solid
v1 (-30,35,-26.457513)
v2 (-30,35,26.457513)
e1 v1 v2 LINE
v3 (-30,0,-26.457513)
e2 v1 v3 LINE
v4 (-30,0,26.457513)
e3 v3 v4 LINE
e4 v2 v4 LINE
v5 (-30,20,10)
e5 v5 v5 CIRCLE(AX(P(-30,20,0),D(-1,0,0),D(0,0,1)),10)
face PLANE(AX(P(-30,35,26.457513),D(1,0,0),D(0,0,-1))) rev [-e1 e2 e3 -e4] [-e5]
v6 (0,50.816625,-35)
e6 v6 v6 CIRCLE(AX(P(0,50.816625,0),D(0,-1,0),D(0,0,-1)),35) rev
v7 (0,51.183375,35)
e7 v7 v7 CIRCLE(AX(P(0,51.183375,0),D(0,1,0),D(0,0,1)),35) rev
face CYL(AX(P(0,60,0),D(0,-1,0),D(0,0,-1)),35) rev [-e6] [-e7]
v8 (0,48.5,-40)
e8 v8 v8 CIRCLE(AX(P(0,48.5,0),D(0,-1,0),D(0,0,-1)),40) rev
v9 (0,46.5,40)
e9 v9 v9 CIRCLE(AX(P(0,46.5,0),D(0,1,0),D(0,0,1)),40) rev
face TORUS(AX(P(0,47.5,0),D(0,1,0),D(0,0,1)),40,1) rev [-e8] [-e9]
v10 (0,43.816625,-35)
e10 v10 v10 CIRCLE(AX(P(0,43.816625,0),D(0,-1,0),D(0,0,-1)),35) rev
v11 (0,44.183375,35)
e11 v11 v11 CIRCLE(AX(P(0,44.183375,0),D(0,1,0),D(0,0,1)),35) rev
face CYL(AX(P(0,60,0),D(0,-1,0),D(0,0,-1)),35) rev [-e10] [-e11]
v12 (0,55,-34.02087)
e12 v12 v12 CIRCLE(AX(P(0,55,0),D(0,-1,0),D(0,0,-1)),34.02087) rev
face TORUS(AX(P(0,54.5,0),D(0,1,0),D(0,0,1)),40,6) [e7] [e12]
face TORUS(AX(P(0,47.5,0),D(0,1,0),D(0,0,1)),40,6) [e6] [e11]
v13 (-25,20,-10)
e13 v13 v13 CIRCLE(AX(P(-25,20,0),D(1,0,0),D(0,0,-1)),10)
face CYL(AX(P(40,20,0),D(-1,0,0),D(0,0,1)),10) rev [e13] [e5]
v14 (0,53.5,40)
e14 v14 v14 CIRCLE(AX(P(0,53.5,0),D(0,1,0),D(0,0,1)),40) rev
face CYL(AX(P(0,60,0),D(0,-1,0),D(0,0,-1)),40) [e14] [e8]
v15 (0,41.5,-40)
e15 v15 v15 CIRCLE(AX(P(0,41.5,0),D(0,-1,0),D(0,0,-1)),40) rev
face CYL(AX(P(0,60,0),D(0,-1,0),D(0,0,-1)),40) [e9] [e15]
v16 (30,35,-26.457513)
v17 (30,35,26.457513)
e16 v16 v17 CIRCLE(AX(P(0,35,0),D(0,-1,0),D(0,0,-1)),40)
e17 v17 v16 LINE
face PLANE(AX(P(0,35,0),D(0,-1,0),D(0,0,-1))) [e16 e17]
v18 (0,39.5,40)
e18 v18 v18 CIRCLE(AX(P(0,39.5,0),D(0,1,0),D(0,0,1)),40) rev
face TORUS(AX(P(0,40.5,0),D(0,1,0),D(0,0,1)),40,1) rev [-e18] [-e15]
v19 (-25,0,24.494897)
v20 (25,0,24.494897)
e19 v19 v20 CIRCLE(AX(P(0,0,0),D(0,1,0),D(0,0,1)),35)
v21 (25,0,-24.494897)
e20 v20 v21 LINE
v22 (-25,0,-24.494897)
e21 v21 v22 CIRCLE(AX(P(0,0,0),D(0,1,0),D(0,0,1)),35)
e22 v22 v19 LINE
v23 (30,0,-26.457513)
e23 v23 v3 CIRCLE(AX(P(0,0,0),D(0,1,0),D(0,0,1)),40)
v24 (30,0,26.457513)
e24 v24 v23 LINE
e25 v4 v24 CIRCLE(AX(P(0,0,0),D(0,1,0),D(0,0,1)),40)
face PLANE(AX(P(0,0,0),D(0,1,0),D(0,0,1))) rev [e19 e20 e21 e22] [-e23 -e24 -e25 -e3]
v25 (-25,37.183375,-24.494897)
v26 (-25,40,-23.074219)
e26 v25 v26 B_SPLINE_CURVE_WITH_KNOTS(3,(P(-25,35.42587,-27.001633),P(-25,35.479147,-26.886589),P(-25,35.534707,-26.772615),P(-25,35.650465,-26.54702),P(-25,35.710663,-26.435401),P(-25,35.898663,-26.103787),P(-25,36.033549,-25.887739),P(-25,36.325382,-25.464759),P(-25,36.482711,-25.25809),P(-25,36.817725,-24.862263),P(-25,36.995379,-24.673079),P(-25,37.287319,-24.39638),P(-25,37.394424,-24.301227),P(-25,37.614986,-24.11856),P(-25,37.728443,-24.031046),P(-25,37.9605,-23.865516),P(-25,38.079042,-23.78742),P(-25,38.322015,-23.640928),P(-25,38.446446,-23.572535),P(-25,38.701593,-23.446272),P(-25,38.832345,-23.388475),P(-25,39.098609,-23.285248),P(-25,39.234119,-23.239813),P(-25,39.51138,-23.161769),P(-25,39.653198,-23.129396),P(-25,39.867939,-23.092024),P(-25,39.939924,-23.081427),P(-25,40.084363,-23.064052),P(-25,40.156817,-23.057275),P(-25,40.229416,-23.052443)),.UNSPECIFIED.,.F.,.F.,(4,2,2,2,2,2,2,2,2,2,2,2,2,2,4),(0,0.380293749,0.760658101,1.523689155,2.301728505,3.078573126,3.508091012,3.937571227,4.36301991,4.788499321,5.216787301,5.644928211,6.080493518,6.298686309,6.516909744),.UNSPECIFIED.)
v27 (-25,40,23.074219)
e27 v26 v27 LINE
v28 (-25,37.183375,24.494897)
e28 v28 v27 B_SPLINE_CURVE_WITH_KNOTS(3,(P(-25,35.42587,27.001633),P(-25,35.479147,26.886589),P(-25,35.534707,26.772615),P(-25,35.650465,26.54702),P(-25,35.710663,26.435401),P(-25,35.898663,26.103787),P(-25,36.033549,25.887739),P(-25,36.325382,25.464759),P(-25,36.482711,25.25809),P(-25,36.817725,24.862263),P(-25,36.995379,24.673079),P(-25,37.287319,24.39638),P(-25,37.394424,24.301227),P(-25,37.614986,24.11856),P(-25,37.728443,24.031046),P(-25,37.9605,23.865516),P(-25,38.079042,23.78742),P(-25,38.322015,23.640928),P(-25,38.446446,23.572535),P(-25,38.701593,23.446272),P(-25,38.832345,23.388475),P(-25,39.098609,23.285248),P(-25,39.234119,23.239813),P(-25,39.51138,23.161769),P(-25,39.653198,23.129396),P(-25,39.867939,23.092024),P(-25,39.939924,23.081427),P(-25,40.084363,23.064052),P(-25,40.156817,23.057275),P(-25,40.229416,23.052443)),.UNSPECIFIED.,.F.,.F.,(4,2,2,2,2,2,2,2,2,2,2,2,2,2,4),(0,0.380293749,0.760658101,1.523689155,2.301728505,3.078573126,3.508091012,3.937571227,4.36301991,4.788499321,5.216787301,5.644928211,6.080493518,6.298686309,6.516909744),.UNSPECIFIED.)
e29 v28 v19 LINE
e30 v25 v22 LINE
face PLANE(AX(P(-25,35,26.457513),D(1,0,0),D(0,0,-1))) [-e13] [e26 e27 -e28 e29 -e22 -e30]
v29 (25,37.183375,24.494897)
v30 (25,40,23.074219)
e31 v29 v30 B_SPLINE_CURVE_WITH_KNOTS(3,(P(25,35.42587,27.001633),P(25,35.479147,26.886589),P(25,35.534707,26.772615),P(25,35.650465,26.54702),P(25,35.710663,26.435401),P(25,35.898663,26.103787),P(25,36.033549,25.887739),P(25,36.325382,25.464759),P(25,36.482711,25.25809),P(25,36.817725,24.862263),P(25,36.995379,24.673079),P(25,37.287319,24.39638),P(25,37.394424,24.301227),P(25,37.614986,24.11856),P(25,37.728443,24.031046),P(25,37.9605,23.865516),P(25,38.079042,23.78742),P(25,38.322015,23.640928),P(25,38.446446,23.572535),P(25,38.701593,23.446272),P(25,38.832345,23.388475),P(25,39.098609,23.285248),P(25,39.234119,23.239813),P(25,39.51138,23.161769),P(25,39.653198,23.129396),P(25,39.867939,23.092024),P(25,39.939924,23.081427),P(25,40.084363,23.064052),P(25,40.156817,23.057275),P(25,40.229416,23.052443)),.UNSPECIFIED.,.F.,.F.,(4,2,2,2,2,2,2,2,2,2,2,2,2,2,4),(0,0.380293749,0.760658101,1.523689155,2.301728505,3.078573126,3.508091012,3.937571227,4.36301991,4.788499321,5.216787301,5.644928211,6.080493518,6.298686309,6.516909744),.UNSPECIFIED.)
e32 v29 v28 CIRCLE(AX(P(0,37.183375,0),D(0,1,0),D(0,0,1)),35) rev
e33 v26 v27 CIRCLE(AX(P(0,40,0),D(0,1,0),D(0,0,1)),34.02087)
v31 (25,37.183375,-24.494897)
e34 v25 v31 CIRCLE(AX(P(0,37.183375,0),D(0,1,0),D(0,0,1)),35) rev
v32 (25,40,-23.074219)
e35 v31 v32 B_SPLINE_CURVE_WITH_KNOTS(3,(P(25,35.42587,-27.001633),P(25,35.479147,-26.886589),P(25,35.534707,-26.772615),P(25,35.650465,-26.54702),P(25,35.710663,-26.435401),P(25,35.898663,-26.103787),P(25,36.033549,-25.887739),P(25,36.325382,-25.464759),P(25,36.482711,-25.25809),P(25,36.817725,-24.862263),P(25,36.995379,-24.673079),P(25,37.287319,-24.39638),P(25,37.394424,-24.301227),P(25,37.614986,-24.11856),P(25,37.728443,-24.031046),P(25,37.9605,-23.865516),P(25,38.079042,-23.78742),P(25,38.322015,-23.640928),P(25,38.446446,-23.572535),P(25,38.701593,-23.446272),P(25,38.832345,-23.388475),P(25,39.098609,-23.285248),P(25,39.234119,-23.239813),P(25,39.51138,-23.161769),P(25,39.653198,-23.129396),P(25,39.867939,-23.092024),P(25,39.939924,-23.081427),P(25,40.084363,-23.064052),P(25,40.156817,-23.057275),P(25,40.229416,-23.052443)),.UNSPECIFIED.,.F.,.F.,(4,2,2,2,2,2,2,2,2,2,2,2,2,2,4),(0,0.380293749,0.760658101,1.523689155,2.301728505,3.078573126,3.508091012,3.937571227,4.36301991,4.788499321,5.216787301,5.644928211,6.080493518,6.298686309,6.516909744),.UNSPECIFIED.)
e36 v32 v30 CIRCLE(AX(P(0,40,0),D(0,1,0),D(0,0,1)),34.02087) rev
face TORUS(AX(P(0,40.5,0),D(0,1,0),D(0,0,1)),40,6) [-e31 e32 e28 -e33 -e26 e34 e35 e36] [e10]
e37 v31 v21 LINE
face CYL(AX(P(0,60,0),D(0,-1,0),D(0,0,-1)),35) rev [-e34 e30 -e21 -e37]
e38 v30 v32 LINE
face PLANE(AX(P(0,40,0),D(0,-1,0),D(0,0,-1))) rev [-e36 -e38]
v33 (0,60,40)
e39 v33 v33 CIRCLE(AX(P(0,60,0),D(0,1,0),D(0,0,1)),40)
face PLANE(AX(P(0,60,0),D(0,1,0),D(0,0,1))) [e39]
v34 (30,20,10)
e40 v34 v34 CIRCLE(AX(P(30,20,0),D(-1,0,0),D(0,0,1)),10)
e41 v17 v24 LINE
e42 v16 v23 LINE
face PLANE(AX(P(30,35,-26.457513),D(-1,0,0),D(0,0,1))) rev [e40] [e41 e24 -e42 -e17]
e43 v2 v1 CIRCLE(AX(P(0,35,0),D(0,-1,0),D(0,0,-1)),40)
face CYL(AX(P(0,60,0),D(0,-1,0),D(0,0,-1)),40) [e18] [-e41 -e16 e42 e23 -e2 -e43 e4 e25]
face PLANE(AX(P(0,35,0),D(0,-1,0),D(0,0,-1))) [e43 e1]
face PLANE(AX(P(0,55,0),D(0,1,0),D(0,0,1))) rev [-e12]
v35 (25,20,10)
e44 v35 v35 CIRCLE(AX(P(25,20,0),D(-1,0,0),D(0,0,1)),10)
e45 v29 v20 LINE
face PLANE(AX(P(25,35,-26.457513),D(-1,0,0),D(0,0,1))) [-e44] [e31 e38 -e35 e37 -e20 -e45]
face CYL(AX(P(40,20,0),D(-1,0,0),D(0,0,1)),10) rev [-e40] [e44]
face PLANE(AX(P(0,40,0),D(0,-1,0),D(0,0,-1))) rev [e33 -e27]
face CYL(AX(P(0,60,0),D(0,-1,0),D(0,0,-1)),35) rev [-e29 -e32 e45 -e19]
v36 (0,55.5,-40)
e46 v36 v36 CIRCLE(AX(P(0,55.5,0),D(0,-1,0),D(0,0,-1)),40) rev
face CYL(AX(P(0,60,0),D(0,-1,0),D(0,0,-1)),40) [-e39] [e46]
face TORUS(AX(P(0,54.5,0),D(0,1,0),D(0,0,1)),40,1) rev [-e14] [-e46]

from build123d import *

# Parameters (mm, degrees)
SKETCH1_R           = 40
BOSS_EXTRUDE1_DEPTH = 60
CUT_EXTRUDE1_DEPTH  = 35
SKETCH4_R           = 1
SHELL1_DEPTH        = 37.18337511
SHELL1_START        = 43.81662469
SHELL1_2_DEPTH      = 0.36675042
SHELL1_START_2      = 50.81662469
SHELL1_3_DEPTH      = 0.36675042
SHELL1_START_3      = 37.18337521
SHELL1_5_DEPTH      = 2.81662479
SKETCH5_R           = 10
CUT_EXTRUDE2_DEPTH  = 101.498756211


with BuildPart() as part:
    # Sketch1 → Boss-Extrude1 (new body)
    with BuildSketch(Plane(origin=(0, 0, 0), x_dir=(1, 0, 0), z_dir=(0, 1, 0))):
        with Locations(Location((0, 0, 0), (0, 0, 270))):
            Circle(SKETCH1_R)
    extrude(amount=BOSS_EXTRUDE1_DEPTH)

    # Sketch3 → Cut-Extrude1 (cut)
    with BuildSketch(Plane.XZ):
        with BuildLine():
            Line((-30, 26.457513111), (-30, -26.457513111))
            ThreePointArc((-30, -26.457513111), (-40, 0), (-30, 26.457513111))
        make_face()
        with BuildLine():
            Line((30, -26.457513111), (30, 26.457513111))
            ThreePointArc((30, 26.457513111), (40, 0), (30, -26.457513111))
        make_face()
    extrude(amount=-CUT_EXTRUDE1_DEPTH, mode=Mode.SUBTRACT)

    # Sketch4 → Cut-Revolve1 (revolve, cut)
    with BuildSketch(Plane.XY, mode=Mode.PRIVATE) as cut_revolve1_sk:
        with Locations((-40, 54.5)):
            Circle(SKETCH4_R)
        with Locations((-40, 47.5)):
            Circle(SKETCH4_R)
        with Locations((-40, 40.5)):
            Circle(SKETCH4_R)
    revolve(cut_revolve1_sk.sketch.rotate(Axis((0, 60, 0), (0, -1, 0)), 90), axis=Axis((0, 60, 0), (0, -1, 0)), mode=Mode.SUBTRACT)

    # Shell1: read off the stored shape, not the designer's step
    # Shell1 outline → Shell1 (cut)
    with BuildSketch(Plane(origin=(0, 0, 0), x_dir=(1, 0, 0), z_dir=(0, 1, 0))):
        with BuildLine():
            ThreePointArc((25, 24.494897428), (0, 35), (-25, 24.494897428))
            Line((-25, 24.494897428), (-25, -24.494897428))
            ThreePointArc((-25, -24.494897428), (0, -35), (25, -24.494897428))
            Line((25, -24.494897428), (25, 24.494897428))
        make_face()
    extrude(amount=SHELL1_DEPTH, mode=Mode.SUBTRACT)

    # Shell1 2 outline → Shell1 2 (cut)
    with BuildSketch(Plane(origin=(0, 0, 0), x_dir=(1, 0, 0), z_dir=(0, 1, 0)).offset(SHELL1_START)):
        with BuildLine():
            ThreePointArc((-25, 24.494897428), (0, -35), (25, 24.494897428))
            ThreePointArc((25, 24.494897428), (0, 35), (-25, 24.494897428))
        make_face()
    extrude(amount=SHELL1_2_DEPTH, mode=Mode.SUBTRACT)

    # Shell1 3 outline → Shell1 3 (cut)
    with BuildSketch(Plane(origin=(0, 0, 0), x_dir=(1, 0, 0), z_dir=(0, 1, 0)).offset(SHELL1_START_2)):
        with BuildLine():
            ThreePointArc((-25, 24.494897428), (0, -35), (25, 24.494897428))
            ThreePointArc((25, 24.494897428), (0, 35), (-25, 24.494897428))
        make_face()
    extrude(amount=SHELL1_3_DEPTH, mode=Mode.SUBTRACT)

    # Shell1 4 outline → Shell1 4 (revolve, cut)
    with BuildSketch(Plane.XY):
        with BuildLine():
            Line((34.020869628, 55), (0, 55))
            Line((0, 55), (0, 51.18337521))
            Line((0, 51.18337521), (35, 51.18337521))
            ThreePointArc((35, 51.18337521), (34.188203193, 53.009021169), (34.020869628, 55))
        make_face()
        with BuildLine():
            Line((35, 50.81662479), (0, 50.81662479))
            Line((0, 50.81662479), (0, 44.18337521))
            Line((0, 44.18337521), (35, 44.18337521))
            ThreePointArc((35, 44.18337521), (34, 47.5), (35, 50.81662479))
        make_face()
        with BuildLine():
            Line((35, 43.81662479), (0, 43.81662479))
            Line((0, 43.81662479), (0, 37.18337521))
            Line((0, 37.18337521), (35, 37.18337521))
            ThreePointArc((35, 37.18337521), (34, 40.5), (35, 43.81662479))
        make_face()
    revolve(axis=Axis((0, 0, 0), (0, 1, 0)), mode=Mode.SUBTRACT)

    # Shell1 5 outline → Shell1 5 (add)
    with BuildSketch(Plane(origin=(0, 0, 0), x_dir=(1, 0, 0), z_dir=(0, 1, 0)).offset(SHELL1_START_3)):
        with BuildLine():
            ThreePointArc((-25, 24.494897428), (-35, 0), (-25, -24.494897428))
            Line((-25, -24.494897428), (-25, 24.494897428))
        make_face()
        with BuildLine():
            ThreePointArc((25, -24.494897428), (35, 0), (25, 24.494897428))
            Line((25, 24.494897428), (25, -24.494897428))
        make_face()
    extrude(amount=SHELL1_5_DEPTH)

    # Sketch5 → Cut-Extrude2 (cut, through all)
    with BuildSketch(Plane.ZY.offset(30)):
        with Locations((0, 20)):
            Circle(SKETCH5_R)
    extrude(amount=-CUT_EXTRUDE2_DEPTH, mode=Mode.SUBTRACT)


solid = part.part
